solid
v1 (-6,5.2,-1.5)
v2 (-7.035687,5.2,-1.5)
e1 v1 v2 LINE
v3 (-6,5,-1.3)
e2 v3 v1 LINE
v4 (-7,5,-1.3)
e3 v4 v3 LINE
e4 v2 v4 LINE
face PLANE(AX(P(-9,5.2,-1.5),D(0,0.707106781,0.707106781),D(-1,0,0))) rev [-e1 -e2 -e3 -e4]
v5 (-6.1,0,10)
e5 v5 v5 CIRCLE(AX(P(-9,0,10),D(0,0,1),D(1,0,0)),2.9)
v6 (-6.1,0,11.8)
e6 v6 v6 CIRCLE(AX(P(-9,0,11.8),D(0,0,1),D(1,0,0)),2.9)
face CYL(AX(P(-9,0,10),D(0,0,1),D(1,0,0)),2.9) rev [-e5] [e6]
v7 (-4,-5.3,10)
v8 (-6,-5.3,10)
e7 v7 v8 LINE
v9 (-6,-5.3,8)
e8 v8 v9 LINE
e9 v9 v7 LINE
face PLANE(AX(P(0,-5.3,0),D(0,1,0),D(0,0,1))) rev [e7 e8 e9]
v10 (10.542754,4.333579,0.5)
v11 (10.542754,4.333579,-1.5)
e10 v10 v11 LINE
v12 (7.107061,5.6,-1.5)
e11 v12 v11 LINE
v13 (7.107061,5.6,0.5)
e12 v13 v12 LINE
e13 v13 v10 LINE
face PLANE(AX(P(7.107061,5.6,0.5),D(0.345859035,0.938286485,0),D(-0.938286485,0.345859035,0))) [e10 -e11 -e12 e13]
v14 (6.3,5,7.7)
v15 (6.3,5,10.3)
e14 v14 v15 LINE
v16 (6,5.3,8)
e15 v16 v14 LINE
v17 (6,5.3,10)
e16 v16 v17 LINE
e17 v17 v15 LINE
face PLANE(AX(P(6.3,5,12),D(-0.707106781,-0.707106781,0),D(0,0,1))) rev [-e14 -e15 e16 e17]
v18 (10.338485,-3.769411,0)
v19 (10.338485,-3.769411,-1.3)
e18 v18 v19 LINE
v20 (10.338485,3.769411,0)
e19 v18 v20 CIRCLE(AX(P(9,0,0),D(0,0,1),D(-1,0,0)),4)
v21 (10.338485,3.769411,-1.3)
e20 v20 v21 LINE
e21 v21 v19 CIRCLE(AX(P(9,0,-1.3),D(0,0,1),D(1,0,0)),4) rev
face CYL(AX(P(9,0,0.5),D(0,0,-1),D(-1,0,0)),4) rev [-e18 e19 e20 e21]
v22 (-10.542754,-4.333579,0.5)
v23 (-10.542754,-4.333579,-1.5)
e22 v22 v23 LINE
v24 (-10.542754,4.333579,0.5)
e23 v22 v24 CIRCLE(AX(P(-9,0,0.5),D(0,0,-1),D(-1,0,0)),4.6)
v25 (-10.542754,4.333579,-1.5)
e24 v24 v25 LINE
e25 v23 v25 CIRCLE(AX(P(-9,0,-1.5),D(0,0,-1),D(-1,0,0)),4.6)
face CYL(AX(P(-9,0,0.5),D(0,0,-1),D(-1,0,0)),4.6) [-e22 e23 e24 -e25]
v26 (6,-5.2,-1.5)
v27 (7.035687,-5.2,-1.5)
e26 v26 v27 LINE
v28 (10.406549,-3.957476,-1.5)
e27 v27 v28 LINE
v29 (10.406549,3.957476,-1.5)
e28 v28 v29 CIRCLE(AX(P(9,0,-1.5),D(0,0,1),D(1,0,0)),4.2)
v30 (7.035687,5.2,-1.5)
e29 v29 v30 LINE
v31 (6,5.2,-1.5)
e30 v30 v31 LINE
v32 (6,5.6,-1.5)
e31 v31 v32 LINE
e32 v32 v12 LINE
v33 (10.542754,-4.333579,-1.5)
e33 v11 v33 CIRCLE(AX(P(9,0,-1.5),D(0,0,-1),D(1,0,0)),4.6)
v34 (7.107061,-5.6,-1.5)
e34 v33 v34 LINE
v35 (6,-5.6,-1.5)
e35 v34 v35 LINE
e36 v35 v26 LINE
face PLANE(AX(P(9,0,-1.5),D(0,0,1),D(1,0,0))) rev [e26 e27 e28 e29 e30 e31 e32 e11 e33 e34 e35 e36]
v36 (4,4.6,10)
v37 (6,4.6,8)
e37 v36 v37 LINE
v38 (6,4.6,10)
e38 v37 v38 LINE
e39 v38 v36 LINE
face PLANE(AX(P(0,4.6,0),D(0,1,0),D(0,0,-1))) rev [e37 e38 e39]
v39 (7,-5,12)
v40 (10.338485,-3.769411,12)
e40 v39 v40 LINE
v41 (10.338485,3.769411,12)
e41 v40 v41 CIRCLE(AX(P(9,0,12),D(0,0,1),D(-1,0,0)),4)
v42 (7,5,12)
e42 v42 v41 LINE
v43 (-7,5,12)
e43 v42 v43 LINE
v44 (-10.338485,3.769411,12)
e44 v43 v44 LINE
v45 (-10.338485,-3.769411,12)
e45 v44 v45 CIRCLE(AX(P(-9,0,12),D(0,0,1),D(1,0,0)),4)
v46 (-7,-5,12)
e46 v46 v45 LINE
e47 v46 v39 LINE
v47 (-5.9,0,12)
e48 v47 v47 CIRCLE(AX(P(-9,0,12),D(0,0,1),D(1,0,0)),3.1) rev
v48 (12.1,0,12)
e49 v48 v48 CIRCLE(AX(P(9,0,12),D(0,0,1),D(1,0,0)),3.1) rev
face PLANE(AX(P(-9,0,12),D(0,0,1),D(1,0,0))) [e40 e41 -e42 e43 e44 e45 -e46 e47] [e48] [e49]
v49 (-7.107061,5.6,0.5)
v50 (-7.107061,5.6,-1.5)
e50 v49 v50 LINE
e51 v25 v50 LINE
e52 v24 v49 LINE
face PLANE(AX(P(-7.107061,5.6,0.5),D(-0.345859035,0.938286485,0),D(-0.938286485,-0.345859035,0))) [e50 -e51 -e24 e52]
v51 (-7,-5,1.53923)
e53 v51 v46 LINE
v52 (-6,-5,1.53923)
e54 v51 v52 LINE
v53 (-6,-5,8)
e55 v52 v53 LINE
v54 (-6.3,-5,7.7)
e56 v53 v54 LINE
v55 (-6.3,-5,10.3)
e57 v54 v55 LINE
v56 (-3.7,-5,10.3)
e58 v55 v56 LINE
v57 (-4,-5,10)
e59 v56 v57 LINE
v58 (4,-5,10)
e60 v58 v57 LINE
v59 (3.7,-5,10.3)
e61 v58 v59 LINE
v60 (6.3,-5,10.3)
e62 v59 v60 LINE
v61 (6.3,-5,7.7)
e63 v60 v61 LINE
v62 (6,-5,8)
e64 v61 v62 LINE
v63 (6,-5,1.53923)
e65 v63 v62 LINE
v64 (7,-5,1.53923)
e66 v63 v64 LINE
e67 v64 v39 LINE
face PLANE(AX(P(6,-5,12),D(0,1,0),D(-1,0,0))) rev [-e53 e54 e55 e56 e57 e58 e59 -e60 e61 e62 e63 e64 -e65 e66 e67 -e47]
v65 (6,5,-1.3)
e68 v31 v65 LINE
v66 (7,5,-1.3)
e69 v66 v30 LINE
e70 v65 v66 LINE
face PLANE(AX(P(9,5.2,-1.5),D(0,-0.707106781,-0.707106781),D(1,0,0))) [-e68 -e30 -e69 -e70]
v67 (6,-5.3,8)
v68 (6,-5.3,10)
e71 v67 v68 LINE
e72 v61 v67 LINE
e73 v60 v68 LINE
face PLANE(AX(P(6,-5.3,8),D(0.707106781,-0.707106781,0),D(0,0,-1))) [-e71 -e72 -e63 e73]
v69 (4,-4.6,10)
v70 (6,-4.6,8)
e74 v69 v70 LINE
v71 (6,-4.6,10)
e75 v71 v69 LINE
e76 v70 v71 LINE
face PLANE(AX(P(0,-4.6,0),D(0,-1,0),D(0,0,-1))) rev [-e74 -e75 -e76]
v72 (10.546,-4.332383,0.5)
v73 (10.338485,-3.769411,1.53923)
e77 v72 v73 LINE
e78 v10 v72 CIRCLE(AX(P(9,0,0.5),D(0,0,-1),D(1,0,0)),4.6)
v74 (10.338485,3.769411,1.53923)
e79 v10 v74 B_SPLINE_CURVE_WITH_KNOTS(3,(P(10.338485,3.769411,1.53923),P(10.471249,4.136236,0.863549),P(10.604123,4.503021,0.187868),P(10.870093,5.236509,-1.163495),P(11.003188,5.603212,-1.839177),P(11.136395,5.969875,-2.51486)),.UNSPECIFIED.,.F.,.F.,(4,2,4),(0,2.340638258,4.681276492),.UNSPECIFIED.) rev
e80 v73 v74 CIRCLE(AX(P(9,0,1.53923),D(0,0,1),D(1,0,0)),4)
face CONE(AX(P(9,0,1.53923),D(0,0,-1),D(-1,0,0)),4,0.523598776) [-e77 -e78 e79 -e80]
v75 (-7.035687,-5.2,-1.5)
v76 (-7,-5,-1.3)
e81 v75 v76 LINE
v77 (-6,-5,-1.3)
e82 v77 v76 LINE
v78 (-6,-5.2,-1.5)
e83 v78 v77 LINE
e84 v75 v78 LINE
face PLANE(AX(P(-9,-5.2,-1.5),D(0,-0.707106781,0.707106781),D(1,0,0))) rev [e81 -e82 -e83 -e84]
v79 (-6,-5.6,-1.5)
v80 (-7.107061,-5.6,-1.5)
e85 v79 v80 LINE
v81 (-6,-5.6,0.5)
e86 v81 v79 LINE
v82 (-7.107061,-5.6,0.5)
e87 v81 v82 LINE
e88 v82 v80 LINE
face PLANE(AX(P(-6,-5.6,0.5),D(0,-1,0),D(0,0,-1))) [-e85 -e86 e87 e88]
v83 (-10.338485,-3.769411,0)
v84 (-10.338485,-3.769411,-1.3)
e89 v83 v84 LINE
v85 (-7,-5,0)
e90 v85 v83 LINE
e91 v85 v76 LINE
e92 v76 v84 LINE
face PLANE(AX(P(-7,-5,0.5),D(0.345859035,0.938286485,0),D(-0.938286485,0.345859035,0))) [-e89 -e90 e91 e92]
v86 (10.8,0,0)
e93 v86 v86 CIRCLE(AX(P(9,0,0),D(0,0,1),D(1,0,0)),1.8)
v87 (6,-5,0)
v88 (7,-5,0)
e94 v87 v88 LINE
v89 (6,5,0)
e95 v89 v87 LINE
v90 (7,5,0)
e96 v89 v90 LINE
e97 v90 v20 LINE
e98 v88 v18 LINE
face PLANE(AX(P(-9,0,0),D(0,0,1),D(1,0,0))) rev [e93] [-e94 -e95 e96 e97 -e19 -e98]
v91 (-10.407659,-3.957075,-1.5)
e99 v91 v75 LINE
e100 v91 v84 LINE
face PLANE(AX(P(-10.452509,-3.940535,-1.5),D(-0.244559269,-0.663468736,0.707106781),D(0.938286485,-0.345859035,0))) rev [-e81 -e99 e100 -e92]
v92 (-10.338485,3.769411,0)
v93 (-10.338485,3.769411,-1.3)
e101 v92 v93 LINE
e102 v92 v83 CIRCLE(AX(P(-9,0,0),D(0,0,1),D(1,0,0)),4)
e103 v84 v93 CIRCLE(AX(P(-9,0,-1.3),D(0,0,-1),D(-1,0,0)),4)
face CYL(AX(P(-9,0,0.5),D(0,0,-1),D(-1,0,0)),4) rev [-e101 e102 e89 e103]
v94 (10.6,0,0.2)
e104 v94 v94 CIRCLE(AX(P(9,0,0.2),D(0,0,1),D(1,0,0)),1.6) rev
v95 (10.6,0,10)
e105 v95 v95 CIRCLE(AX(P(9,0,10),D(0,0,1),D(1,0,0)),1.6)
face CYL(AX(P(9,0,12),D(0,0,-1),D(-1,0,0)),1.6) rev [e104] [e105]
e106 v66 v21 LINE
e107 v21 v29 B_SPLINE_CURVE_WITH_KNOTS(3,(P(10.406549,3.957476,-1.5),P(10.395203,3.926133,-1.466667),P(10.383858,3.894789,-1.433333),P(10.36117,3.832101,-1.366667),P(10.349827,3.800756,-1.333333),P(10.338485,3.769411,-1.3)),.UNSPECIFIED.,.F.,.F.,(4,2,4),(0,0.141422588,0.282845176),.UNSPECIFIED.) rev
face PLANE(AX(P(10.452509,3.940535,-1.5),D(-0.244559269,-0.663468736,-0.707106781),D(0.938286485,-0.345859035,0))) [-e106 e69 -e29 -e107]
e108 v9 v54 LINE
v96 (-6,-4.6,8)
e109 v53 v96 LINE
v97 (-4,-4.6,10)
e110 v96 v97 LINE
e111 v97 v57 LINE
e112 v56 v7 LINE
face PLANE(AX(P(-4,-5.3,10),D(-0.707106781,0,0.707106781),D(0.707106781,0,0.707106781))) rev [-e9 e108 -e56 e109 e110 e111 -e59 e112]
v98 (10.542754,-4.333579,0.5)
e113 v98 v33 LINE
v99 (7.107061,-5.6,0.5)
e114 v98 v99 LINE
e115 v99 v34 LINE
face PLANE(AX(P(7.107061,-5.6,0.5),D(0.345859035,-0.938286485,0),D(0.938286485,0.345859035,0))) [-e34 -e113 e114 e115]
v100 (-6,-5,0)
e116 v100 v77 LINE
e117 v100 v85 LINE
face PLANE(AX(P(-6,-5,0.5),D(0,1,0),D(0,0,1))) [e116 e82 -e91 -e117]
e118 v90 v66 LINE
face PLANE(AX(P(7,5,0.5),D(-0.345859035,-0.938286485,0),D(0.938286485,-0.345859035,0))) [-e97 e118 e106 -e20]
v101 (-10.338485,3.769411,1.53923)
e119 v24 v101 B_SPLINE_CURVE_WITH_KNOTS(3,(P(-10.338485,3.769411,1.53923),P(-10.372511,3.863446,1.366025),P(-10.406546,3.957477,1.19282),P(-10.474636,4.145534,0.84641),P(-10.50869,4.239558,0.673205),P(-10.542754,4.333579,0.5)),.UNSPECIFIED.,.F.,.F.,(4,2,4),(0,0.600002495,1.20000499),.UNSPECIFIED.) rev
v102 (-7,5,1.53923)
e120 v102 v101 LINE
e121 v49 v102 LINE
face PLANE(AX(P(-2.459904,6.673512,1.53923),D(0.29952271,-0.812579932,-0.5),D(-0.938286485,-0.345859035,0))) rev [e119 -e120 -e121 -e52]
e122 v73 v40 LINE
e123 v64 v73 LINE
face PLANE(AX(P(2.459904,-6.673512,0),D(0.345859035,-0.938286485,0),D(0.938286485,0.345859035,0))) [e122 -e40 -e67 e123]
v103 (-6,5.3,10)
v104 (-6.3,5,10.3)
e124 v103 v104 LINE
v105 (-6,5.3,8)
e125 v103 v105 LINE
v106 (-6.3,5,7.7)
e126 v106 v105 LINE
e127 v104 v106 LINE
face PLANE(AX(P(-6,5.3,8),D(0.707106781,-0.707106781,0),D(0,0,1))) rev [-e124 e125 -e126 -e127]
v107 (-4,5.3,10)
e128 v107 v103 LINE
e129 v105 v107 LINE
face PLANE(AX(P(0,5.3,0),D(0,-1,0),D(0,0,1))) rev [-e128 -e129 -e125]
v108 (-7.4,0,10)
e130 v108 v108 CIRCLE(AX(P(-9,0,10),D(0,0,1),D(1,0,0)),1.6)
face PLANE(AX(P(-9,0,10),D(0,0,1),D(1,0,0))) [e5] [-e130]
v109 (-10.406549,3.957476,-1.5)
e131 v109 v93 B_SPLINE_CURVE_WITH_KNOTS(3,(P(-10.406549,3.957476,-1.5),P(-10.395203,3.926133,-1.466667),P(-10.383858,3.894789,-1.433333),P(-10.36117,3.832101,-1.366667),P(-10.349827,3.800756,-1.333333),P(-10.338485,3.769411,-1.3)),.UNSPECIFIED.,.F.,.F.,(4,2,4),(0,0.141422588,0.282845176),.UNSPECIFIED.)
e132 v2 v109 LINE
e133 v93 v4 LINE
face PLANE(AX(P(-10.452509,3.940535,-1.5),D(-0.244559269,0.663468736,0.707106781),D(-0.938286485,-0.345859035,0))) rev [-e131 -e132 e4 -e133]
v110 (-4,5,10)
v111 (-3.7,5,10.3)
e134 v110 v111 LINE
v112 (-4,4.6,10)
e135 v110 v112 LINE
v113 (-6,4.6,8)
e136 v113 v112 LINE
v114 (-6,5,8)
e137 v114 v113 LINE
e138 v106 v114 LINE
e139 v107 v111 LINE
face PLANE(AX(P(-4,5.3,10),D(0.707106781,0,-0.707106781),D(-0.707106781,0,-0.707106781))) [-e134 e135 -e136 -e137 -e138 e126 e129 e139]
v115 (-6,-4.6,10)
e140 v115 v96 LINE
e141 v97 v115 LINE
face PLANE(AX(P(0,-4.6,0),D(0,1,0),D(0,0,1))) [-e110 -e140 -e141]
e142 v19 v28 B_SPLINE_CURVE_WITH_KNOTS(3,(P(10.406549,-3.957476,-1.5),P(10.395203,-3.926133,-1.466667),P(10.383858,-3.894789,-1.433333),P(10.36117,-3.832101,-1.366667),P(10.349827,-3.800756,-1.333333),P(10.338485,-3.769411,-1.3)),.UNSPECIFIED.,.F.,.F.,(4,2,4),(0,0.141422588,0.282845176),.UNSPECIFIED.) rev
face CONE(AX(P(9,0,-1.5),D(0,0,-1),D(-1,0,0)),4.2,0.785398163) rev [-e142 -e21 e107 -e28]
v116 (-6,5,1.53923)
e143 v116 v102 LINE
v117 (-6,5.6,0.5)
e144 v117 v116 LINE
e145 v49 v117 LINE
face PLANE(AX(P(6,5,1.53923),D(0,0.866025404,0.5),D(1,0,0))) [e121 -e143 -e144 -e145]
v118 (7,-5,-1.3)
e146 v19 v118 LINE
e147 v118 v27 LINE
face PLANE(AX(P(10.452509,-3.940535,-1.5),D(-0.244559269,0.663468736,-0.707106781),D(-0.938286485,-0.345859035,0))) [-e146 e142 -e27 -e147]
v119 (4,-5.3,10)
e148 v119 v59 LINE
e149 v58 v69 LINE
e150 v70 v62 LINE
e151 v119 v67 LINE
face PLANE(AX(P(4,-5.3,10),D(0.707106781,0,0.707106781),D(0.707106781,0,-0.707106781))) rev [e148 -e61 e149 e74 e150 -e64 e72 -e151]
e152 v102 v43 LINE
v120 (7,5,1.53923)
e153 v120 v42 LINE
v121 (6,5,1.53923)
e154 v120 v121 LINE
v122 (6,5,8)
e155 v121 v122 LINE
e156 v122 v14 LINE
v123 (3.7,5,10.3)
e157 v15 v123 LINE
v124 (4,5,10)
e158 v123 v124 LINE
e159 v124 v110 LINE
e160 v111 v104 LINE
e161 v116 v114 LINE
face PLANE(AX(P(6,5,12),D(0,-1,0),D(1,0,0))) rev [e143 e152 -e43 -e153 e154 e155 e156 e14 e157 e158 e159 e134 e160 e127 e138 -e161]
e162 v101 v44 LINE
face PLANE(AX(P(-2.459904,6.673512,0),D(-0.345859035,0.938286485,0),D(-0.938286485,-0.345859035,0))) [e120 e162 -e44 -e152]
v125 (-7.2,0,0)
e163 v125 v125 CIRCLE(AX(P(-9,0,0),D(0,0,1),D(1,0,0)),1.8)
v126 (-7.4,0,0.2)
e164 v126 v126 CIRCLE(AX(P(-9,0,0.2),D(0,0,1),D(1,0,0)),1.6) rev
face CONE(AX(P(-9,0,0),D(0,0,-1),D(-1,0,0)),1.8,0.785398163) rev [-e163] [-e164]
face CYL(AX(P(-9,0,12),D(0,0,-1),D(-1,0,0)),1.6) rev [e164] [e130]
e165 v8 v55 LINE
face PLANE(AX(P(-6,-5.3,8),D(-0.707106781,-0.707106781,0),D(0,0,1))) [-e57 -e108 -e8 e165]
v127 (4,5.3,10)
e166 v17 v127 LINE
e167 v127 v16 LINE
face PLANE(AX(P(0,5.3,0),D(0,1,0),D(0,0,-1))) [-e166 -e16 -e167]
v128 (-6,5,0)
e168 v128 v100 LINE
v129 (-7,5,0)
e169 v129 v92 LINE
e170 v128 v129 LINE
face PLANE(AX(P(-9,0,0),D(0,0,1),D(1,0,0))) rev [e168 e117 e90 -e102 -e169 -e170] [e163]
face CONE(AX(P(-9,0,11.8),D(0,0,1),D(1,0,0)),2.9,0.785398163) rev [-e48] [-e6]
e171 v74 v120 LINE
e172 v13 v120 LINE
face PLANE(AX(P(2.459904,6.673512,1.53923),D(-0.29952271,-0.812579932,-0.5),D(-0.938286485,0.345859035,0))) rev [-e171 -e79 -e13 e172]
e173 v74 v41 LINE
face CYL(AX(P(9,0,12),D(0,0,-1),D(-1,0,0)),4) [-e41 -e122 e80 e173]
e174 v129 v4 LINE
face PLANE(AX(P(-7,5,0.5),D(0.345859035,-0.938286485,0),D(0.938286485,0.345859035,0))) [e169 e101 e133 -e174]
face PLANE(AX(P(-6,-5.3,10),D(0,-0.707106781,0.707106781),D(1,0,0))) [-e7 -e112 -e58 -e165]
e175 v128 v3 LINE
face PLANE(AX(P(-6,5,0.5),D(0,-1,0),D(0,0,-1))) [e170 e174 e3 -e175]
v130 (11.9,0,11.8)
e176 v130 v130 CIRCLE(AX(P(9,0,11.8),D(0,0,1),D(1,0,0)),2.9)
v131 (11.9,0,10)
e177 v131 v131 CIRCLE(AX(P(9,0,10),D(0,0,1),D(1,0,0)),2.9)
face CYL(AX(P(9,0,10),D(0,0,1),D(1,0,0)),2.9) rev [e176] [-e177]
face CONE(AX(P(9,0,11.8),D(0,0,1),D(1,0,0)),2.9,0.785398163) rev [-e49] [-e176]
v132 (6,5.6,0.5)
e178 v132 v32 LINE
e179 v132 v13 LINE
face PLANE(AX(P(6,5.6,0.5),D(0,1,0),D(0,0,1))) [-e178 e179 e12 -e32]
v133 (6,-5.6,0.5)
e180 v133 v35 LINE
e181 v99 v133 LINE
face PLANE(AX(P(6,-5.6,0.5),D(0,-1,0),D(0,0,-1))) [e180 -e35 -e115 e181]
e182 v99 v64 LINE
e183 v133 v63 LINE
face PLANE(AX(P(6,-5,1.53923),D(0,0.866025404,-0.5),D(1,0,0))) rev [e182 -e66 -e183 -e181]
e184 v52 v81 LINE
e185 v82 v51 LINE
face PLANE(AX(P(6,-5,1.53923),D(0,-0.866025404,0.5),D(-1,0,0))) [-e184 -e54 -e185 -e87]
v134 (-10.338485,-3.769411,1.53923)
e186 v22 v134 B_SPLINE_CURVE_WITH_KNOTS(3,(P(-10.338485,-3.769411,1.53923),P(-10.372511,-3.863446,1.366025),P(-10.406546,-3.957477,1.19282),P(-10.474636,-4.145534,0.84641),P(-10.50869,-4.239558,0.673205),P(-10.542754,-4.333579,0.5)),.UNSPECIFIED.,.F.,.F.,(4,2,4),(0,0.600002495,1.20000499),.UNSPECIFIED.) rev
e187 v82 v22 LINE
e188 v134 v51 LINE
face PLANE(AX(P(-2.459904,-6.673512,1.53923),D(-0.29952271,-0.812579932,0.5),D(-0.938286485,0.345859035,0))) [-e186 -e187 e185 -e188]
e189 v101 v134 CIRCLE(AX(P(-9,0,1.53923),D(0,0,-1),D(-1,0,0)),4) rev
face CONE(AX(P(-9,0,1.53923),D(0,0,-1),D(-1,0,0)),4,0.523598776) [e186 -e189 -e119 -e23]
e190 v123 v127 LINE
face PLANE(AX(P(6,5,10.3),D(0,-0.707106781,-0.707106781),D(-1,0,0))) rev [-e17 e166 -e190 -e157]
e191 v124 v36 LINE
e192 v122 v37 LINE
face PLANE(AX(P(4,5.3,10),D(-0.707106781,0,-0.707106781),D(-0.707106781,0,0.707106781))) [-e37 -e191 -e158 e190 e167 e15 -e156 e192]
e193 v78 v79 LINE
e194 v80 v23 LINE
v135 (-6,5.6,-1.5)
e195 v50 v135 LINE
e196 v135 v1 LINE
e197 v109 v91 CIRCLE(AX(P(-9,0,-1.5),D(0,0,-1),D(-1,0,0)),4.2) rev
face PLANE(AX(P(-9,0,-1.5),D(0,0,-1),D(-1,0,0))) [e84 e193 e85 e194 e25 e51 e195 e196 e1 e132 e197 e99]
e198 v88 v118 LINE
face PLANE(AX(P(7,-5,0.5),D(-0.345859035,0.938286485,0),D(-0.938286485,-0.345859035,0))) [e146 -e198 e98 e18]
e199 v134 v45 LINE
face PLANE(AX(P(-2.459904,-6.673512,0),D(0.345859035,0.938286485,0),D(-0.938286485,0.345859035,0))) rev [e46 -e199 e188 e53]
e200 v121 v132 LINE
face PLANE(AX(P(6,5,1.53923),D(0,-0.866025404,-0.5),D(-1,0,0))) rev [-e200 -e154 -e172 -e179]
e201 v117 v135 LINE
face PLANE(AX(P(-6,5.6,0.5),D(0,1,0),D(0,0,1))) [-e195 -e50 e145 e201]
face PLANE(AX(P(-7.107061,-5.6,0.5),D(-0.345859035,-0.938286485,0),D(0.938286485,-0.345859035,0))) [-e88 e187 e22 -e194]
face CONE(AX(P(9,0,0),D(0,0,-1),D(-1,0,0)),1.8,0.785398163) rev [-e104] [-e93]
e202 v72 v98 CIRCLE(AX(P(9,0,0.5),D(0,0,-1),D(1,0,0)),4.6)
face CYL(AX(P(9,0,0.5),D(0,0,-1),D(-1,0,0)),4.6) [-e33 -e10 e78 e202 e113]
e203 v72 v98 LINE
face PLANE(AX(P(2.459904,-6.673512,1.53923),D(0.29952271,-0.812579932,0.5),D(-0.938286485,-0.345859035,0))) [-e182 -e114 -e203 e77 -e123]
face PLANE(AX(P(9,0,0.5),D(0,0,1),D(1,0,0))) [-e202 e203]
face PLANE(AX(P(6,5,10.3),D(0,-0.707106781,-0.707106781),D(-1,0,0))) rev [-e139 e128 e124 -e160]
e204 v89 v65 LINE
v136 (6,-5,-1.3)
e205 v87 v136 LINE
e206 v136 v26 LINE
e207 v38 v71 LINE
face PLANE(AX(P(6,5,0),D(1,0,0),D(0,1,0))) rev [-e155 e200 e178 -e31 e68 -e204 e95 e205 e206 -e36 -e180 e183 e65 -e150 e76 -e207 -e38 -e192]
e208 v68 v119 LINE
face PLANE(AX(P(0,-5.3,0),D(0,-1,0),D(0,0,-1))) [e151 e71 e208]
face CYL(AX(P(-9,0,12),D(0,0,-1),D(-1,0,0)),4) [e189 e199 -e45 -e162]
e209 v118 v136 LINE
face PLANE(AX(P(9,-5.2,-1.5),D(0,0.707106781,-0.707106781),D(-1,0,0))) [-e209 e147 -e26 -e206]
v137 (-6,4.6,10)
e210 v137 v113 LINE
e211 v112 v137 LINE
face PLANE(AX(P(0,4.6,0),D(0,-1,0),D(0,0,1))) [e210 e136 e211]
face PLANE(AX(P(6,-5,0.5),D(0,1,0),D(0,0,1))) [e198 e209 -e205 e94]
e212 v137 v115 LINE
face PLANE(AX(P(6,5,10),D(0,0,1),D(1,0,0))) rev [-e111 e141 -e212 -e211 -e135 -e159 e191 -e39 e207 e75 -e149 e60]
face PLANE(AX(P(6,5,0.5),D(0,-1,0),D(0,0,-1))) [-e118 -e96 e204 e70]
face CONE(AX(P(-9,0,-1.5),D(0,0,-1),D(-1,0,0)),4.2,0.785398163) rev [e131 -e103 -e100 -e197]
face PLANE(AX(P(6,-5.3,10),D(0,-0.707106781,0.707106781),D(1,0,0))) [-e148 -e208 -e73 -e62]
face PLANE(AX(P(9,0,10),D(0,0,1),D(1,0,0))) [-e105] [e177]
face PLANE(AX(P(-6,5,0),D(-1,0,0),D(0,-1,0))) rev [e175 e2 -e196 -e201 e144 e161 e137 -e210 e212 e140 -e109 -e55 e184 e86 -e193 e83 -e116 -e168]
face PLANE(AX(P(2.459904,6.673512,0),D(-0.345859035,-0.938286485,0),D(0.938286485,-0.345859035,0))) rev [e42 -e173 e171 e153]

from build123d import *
from OCP.BRepFilletAPI import BRepFilletAPI_MakeChamfer

# Parameters (mm, degrees)
SKIZZE2_R                            = 1.6
AUFSATZ_LINEAR_AUSTRAGEN1_DEPTH      = 12
SCHNITT_LINEAR_AUSTRAGEN1_DEPTH      = 19.384776311
SCHNITT_LINEAR_AUSTRAGEN1_DEPTH_BACK = 19.384776311
SKIZZE3_W                            = 12
SKIZZE3_H                            = 10
AUFSATZ_LINEAR_AUSTRAGEN2_DEPTH      = 12
AUFSATZ_LINEAR_START                 = -0.4
AUFSATZ_LINEAR_AUSTRAGEN3_DEPTH      = 0.7
FASE3_SIZE                           = 0.3
AUFSATZ_LINEAR_AUSTRAGEN4_DEPTH      = 2
FASE1_SIZE                           = 0.6
FASE1_SIZE_2                         = 1.039230485
SKIZZE7_R                            = 2.9
SCHNITT_LINEAR_AUSTRAGEN2_DEPTH      = 2
FASE2_SIZE                           = 0.2


with BuildPart() as part:
    # Skizze2 → Aufsatz-Linear austragen1 (new body)
    with BuildSketch(Plane.XY):
        with BuildLine():
            Line((-6, -2.645751311), (-6, -5))
            Line((-6, -5), (6, -5))
            Line((6, -5), (6, -2.645751311))
            ThreePointArc((6, -2.645751311), (13, 0), (6, 2.645751311))
            Line((6, 2.645751311), (6, 5))
            Line((6, 5), (-6, 5))
            Line((-6, 5), (-6, 2.645751311))
            ThreePointArc((-6, 2.645751311), (-13, 0), (-6, -2.645751311))
        make_face()
        with Locations((-9, 0)):
            Circle(SKIZZE2_R, mode=Mode.SUBTRACT)
        with Locations(Location((9, 0, 0), (0, 0, 180))):
            Circle(SKIZZE2_R, mode=Mode.SUBTRACT)
    extrude(amount=AUFSATZ_LINEAR_AUSTRAGEN1_DEPTH)

    # Skizze3 → Schnitt-Linear austragen1 (cut, two sides: drawn at the far end of the back side and taken through both)
    with BuildSketch(Plane(origin=(0, 0, 0), x_dir=(-1, 0, 0), z_dir=(0, -1, 0)).offset(-SCHNITT_LINEAR_AUSTRAGEN1_DEPTH_BACK)):
        with Locations((0, -5)):
            Rectangle(SKIZZE3_W, SKIZZE3_H)
    extrude(amount=SCHNITT_LINEAR_AUSTRAGEN1_DEPTH + SCHNITT_LINEAR_AUSTRAGEN1_DEPTH_BACK, mode=Mode.SUBTRACT)

    # Skizze4 → Aufsatz-Linear austragen2 (add, through all)
    with BuildSketch(Plane.XY.offset(12)):
        with BuildLine():
            Line((-6, 2.645751311), (-6, 5))
            Line((-6, 5), (-7, 5))
            Line((-7, 5), (-10.338485005, 3.769410815))
            ThreePointArc((-10.338485005, 3.769410815), (-7.997098863, 3.872233117), (-6, 2.645751311))
        make_face()
        with BuildLine():
            ThreePointArc((-6, -2.645751311), (-7.997098863, -3.872233117), (-10.338485005, -3.769410815))
            Line((-10.338485005, -3.769410815), (-7, -5))
            Line((-7, -5), (-6, -5))
            Line((-6, -5), (-6, -2.645751311))
        make_face()
        with BuildLine():
            ThreePointArc((6, 2.645751311), (7.997098863, 3.872233117), (10.338485005, 3.769410815))
            Line((10.338485005, 3.769410815), (7, 5))
            Line((7, 5), (6, 5))
            Line((6, 5), (6, 2.645751311))
        make_face()
        with BuildLine():
            Line((6, -2.645751311), (6, -5))
            Line((6, -5), (7, -5))
            Line((7, -5), (10.338485005, -3.769410815))
            ThreePointArc((10.338485005, -3.769410815), (7.997098863, -3.872233117), (6, -2.645751311))
        make_face()
    extrude(amount=-AUFSATZ_LINEAR_AUSTRAGEN2_DEPTH)

    # Skizze5 → Aufsatz-Linear austragen3 (add)
    with BuildSketch(Plane.XZ.offset(5).offset(AUFSATZ_LINEAR_START)):
        Polygon((-6, 10), (-4, 10), (-6, 8), align=None)
        Polygon((6, 8), (6, 10), (4, 10), align=None)
    aufsatz_linear_austragen3 = extrude(amount=AUFSATZ_LINEAR_AUSTRAGEN3_DEPTH)

    # Spiegeln1: Aufsatz-Linear austragen3 across plane
    add(aufsatz_linear_austragen3.mirror(Plane(origin=(0, 0, 0), x_dir=(0, 0, 1), z_dir=(0, -1, 0))))

    # Fase3
    fase3_edges = [part.edges().sort_by_distance(p)[0] for p in [
        (6, -5, 9),
        (5, -5, 10),
        (-6, -5, 9),
        (-5, -5, 10),
        (6, 5, 9),
        (5, 5, 10),
        (-5, 5, 10),
        (-6, 5, 9),
    ]]
    chamfer(fase3_edges, length=FASE3_SIZE - 0.0001)  # a hair under: the kernel refuses the full size

    # Skizze6 → Aufsatz-Linear austragen4 (add)
    with BuildSketch(Plane(origin=(0, 0, -1.5), x_dir=(-1, 0, 0), z_dir=(0, 0, -1))):
        with BuildLine():
            Line((6, -5), (7, -5))
            Line((7, -5), (10.338485005, -3.769410815))
            ThreePointArc((10.338485005, -3.769410815), (13, 0), (10.338485005, 3.769410815))
            Line((10.338485005, 3.769410815), (7, 5))
            Line((7, 5), (6, 5))
            Line((6, 5), (6, 5.6))
            Line((6, 5.6), (7.107061274, 5.6))
            Line((7.107061274, 5.6), (10.542753877, 4.333579407))
            ThreePointArc((10.542753877, 4.333579407), (13.6, 0), (10.542753877, -4.333579407))
            Line((10.542753877, -4.333579407), (7.107061274, -5.6))
            Line((7.107061274, -5.6), (6, -5.6))
            Line((6, -5.6), (6, -5))
        make_face()
        with BuildLine():
            Line((-6, -5), (-6, -5.6))
            Line((-6, -5.6), (-7.107061274, -5.6))
            Line((-7.107061274, -5.6), (-10.542753877, -4.333579407))
            ThreePointArc((-10.542753877, -4.333579407), (-13.6, 0), (-10.542753877, 4.333579407))
            Line((-10.542753877, 4.333579407), (-7.107061274, 5.6))
            Line((-7.107061274, 5.6), (-6, 5.6))
            Line((-6, 5.6), (-6, 5))
            Line((-6, 5), (-7, 5))
            Line((-7, 5), (-10.338485005, 3.769410815))
            ThreePointArc((-10.338485005, 3.769410815), (-13, 0), (-10.338485005, -3.769410815))
            Line((-10.338485005, -3.769410815), (-7, -5))
            Line((-7, -5), (-6, -5))
        make_face()
    extrude(amount=-AUFSATZ_LINEAR_AUSTRAGEN4_DEPTH)

    # Fase1
    fase1_edges_1 = [part.edges().sort_by_distance(p)[0] for p in [
        (-6.5, -5, 0.5),
    ]]
    fase1_side_1 = [part.faces().sort_by_distance(p)[0] for p in [
        (-6.5, -5.012, 0.5),
    ]]
    fase1_edges_2 = [part.edges().sort_by_distance(p)[0] for p in [
        (-8.669242502, -4.384705408, 0.5),
    ]]
    fase1_side_2 = [part.faces().sort_by_distance(p)[0] for p in [
        (-8.673392811, -4.395964845, 0.5),
    ]]
    fase1_edges_3 = [part.edges().sort_by_distance(p)[0] for p in [
        (-8.669242502, 4.384705408, 0.5),
    ]]
    fase1_side_3 = [part.faces().sort_by_distance(p)[0] for p in [
        (-8.673392811, 4.395964845, 0.5),
    ]]
    fase1_edges_4 = [part.edges().sort_by_distance(p)[0] for p in [
        (-6.5, 5, 0.5),
    ]]
    fase1_side_4 = [part.faces().sort_by_distance(p)[0] for p in [
        (-6.5, 5, 0.512),
    ]]
    fase1_edges_5 = [part.edges().sort_by_distance(p)[0] for p in [
        (6.5, 5, 0.5),
    ]]
    fase1_side_5 = [part.faces().sort_by_distance(p)[0] for p in [
        (6.5, 5, 0.512),
    ]]
    fase1_edges_6 = [part.edges().sort_by_distance(p)[0] for p in [
        (8.669242502, 4.384705408, 0.5),
    ]]
    fase1_side_6 = [part.faces().sort_by_distance(p)[0] for p in [
        (8.669242502, 4.384705408, 0.512),
    ]]
    fase1_edges_7 = [part.edges().sort_by_distance(p)[0] for p in [
        (8.669242502, -4.384705408, 0.5),
    ]]
    fase1_side_7 = [part.faces().sort_by_distance(p)[0] for p in [
        (8.673392811, -4.395964845, 0.5),
    ]]
    fase1_edges_8 = [part.edges().sort_by_distance(p)[0] for p in [
        (6.5, -5, 0.5),
    ]]
    fase1_side_8 = [part.faces().sort_by_distance(p)[0] for p in [
        (6.5, -5.012, 0.5),
    ]]
    fase1 = BRepFilletAPI_MakeChamfer(part.part.solid().wrapped)
    for e in fase1_edges_1:
        fase1.Add(FASE1_SIZE - 0.0001, FASE1_SIZE_2 - 0.0001, e.wrapped, fase1_side_1[0].wrapped)
    for e in fase1_edges_2:
        fase1.Add(FASE1_SIZE - 0.0001, FASE1_SIZE_2 - 0.0001, e.wrapped, fase1_side_2[0].wrapped)
    for e in fase1_edges_3:
        fase1.Add(FASE1_SIZE - 0.0001, FASE1_SIZE_2 - 0.0001, e.wrapped, fase1_side_3[0].wrapped)
    for e in fase1_edges_4:
        fase1.Add(FASE1_SIZE_2 - 0.0001, FASE1_SIZE - 0.0001, e.wrapped, fase1_side_4[0].wrapped)
    for e in fase1_edges_5:
        fase1.Add(FASE1_SIZE_2 - 0.0001, FASE1_SIZE - 0.0001, e.wrapped, fase1_side_5[0].wrapped)
    for e in fase1_edges_6:
        fase1.Add(FASE1_SIZE_2 - 0.0001, FASE1_SIZE - 0.0001, e.wrapped, fase1_side_6[0].wrapped)
    for e in fase1_edges_7:
        fase1.Add(FASE1_SIZE - 0.0001, FASE1_SIZE_2 - 0.0001, e.wrapped, fase1_side_7[0].wrapped)
    for e in fase1_edges_8:
        fase1.Add(FASE1_SIZE - 0.0001, FASE1_SIZE_2 - 0.0001, e.wrapped, fase1_side_8[0].wrapped)
    add(Compound.cast(fase1.Shape()), mode=Mode.REPLACE)  # a hair under: the kernel refuses the full size

    # Skizze7 → Schnitt-Linear austragen2 (cut)
    with BuildSketch(Plane.XY.offset(12)):
        with Locations((-9, 0)):
            Circle(SKIZZE7_R)
        with Locations((9, 0)):
            Circle(SKIZZE7_R)
    extrude(amount=-SCHNITT_LINEAR_AUSTRAGEN2_DEPTH, mode=Mode.SUBTRACT)

    # Fase2
    fase2_edges = [part.edges().sort_by_distance(p)[0] for p in [
        (-6.5, -5, -1.5),
        (-8.669242502, -4.384705408, -1.5),
        (-8.669242502, 4.384705408, -1.5),
        (-6.5, 5, -1.5),
        (6.5, -5, -1.5),
        (8.669242502, -4.384705408, -1.5),
        (13, 0, -1.5),
        (8.669242502, 4.384705408, -1.5),
        (6.5, 5, -1.5),
        (10.6, 0, 0),
        (-10.6, 0, 0),
        (-11.9, 0, 12),
        (6.1, 0, 12),
    ]]
    chamfer(fase2_edges, length=FASE2_SIZE)


solid = part.part
